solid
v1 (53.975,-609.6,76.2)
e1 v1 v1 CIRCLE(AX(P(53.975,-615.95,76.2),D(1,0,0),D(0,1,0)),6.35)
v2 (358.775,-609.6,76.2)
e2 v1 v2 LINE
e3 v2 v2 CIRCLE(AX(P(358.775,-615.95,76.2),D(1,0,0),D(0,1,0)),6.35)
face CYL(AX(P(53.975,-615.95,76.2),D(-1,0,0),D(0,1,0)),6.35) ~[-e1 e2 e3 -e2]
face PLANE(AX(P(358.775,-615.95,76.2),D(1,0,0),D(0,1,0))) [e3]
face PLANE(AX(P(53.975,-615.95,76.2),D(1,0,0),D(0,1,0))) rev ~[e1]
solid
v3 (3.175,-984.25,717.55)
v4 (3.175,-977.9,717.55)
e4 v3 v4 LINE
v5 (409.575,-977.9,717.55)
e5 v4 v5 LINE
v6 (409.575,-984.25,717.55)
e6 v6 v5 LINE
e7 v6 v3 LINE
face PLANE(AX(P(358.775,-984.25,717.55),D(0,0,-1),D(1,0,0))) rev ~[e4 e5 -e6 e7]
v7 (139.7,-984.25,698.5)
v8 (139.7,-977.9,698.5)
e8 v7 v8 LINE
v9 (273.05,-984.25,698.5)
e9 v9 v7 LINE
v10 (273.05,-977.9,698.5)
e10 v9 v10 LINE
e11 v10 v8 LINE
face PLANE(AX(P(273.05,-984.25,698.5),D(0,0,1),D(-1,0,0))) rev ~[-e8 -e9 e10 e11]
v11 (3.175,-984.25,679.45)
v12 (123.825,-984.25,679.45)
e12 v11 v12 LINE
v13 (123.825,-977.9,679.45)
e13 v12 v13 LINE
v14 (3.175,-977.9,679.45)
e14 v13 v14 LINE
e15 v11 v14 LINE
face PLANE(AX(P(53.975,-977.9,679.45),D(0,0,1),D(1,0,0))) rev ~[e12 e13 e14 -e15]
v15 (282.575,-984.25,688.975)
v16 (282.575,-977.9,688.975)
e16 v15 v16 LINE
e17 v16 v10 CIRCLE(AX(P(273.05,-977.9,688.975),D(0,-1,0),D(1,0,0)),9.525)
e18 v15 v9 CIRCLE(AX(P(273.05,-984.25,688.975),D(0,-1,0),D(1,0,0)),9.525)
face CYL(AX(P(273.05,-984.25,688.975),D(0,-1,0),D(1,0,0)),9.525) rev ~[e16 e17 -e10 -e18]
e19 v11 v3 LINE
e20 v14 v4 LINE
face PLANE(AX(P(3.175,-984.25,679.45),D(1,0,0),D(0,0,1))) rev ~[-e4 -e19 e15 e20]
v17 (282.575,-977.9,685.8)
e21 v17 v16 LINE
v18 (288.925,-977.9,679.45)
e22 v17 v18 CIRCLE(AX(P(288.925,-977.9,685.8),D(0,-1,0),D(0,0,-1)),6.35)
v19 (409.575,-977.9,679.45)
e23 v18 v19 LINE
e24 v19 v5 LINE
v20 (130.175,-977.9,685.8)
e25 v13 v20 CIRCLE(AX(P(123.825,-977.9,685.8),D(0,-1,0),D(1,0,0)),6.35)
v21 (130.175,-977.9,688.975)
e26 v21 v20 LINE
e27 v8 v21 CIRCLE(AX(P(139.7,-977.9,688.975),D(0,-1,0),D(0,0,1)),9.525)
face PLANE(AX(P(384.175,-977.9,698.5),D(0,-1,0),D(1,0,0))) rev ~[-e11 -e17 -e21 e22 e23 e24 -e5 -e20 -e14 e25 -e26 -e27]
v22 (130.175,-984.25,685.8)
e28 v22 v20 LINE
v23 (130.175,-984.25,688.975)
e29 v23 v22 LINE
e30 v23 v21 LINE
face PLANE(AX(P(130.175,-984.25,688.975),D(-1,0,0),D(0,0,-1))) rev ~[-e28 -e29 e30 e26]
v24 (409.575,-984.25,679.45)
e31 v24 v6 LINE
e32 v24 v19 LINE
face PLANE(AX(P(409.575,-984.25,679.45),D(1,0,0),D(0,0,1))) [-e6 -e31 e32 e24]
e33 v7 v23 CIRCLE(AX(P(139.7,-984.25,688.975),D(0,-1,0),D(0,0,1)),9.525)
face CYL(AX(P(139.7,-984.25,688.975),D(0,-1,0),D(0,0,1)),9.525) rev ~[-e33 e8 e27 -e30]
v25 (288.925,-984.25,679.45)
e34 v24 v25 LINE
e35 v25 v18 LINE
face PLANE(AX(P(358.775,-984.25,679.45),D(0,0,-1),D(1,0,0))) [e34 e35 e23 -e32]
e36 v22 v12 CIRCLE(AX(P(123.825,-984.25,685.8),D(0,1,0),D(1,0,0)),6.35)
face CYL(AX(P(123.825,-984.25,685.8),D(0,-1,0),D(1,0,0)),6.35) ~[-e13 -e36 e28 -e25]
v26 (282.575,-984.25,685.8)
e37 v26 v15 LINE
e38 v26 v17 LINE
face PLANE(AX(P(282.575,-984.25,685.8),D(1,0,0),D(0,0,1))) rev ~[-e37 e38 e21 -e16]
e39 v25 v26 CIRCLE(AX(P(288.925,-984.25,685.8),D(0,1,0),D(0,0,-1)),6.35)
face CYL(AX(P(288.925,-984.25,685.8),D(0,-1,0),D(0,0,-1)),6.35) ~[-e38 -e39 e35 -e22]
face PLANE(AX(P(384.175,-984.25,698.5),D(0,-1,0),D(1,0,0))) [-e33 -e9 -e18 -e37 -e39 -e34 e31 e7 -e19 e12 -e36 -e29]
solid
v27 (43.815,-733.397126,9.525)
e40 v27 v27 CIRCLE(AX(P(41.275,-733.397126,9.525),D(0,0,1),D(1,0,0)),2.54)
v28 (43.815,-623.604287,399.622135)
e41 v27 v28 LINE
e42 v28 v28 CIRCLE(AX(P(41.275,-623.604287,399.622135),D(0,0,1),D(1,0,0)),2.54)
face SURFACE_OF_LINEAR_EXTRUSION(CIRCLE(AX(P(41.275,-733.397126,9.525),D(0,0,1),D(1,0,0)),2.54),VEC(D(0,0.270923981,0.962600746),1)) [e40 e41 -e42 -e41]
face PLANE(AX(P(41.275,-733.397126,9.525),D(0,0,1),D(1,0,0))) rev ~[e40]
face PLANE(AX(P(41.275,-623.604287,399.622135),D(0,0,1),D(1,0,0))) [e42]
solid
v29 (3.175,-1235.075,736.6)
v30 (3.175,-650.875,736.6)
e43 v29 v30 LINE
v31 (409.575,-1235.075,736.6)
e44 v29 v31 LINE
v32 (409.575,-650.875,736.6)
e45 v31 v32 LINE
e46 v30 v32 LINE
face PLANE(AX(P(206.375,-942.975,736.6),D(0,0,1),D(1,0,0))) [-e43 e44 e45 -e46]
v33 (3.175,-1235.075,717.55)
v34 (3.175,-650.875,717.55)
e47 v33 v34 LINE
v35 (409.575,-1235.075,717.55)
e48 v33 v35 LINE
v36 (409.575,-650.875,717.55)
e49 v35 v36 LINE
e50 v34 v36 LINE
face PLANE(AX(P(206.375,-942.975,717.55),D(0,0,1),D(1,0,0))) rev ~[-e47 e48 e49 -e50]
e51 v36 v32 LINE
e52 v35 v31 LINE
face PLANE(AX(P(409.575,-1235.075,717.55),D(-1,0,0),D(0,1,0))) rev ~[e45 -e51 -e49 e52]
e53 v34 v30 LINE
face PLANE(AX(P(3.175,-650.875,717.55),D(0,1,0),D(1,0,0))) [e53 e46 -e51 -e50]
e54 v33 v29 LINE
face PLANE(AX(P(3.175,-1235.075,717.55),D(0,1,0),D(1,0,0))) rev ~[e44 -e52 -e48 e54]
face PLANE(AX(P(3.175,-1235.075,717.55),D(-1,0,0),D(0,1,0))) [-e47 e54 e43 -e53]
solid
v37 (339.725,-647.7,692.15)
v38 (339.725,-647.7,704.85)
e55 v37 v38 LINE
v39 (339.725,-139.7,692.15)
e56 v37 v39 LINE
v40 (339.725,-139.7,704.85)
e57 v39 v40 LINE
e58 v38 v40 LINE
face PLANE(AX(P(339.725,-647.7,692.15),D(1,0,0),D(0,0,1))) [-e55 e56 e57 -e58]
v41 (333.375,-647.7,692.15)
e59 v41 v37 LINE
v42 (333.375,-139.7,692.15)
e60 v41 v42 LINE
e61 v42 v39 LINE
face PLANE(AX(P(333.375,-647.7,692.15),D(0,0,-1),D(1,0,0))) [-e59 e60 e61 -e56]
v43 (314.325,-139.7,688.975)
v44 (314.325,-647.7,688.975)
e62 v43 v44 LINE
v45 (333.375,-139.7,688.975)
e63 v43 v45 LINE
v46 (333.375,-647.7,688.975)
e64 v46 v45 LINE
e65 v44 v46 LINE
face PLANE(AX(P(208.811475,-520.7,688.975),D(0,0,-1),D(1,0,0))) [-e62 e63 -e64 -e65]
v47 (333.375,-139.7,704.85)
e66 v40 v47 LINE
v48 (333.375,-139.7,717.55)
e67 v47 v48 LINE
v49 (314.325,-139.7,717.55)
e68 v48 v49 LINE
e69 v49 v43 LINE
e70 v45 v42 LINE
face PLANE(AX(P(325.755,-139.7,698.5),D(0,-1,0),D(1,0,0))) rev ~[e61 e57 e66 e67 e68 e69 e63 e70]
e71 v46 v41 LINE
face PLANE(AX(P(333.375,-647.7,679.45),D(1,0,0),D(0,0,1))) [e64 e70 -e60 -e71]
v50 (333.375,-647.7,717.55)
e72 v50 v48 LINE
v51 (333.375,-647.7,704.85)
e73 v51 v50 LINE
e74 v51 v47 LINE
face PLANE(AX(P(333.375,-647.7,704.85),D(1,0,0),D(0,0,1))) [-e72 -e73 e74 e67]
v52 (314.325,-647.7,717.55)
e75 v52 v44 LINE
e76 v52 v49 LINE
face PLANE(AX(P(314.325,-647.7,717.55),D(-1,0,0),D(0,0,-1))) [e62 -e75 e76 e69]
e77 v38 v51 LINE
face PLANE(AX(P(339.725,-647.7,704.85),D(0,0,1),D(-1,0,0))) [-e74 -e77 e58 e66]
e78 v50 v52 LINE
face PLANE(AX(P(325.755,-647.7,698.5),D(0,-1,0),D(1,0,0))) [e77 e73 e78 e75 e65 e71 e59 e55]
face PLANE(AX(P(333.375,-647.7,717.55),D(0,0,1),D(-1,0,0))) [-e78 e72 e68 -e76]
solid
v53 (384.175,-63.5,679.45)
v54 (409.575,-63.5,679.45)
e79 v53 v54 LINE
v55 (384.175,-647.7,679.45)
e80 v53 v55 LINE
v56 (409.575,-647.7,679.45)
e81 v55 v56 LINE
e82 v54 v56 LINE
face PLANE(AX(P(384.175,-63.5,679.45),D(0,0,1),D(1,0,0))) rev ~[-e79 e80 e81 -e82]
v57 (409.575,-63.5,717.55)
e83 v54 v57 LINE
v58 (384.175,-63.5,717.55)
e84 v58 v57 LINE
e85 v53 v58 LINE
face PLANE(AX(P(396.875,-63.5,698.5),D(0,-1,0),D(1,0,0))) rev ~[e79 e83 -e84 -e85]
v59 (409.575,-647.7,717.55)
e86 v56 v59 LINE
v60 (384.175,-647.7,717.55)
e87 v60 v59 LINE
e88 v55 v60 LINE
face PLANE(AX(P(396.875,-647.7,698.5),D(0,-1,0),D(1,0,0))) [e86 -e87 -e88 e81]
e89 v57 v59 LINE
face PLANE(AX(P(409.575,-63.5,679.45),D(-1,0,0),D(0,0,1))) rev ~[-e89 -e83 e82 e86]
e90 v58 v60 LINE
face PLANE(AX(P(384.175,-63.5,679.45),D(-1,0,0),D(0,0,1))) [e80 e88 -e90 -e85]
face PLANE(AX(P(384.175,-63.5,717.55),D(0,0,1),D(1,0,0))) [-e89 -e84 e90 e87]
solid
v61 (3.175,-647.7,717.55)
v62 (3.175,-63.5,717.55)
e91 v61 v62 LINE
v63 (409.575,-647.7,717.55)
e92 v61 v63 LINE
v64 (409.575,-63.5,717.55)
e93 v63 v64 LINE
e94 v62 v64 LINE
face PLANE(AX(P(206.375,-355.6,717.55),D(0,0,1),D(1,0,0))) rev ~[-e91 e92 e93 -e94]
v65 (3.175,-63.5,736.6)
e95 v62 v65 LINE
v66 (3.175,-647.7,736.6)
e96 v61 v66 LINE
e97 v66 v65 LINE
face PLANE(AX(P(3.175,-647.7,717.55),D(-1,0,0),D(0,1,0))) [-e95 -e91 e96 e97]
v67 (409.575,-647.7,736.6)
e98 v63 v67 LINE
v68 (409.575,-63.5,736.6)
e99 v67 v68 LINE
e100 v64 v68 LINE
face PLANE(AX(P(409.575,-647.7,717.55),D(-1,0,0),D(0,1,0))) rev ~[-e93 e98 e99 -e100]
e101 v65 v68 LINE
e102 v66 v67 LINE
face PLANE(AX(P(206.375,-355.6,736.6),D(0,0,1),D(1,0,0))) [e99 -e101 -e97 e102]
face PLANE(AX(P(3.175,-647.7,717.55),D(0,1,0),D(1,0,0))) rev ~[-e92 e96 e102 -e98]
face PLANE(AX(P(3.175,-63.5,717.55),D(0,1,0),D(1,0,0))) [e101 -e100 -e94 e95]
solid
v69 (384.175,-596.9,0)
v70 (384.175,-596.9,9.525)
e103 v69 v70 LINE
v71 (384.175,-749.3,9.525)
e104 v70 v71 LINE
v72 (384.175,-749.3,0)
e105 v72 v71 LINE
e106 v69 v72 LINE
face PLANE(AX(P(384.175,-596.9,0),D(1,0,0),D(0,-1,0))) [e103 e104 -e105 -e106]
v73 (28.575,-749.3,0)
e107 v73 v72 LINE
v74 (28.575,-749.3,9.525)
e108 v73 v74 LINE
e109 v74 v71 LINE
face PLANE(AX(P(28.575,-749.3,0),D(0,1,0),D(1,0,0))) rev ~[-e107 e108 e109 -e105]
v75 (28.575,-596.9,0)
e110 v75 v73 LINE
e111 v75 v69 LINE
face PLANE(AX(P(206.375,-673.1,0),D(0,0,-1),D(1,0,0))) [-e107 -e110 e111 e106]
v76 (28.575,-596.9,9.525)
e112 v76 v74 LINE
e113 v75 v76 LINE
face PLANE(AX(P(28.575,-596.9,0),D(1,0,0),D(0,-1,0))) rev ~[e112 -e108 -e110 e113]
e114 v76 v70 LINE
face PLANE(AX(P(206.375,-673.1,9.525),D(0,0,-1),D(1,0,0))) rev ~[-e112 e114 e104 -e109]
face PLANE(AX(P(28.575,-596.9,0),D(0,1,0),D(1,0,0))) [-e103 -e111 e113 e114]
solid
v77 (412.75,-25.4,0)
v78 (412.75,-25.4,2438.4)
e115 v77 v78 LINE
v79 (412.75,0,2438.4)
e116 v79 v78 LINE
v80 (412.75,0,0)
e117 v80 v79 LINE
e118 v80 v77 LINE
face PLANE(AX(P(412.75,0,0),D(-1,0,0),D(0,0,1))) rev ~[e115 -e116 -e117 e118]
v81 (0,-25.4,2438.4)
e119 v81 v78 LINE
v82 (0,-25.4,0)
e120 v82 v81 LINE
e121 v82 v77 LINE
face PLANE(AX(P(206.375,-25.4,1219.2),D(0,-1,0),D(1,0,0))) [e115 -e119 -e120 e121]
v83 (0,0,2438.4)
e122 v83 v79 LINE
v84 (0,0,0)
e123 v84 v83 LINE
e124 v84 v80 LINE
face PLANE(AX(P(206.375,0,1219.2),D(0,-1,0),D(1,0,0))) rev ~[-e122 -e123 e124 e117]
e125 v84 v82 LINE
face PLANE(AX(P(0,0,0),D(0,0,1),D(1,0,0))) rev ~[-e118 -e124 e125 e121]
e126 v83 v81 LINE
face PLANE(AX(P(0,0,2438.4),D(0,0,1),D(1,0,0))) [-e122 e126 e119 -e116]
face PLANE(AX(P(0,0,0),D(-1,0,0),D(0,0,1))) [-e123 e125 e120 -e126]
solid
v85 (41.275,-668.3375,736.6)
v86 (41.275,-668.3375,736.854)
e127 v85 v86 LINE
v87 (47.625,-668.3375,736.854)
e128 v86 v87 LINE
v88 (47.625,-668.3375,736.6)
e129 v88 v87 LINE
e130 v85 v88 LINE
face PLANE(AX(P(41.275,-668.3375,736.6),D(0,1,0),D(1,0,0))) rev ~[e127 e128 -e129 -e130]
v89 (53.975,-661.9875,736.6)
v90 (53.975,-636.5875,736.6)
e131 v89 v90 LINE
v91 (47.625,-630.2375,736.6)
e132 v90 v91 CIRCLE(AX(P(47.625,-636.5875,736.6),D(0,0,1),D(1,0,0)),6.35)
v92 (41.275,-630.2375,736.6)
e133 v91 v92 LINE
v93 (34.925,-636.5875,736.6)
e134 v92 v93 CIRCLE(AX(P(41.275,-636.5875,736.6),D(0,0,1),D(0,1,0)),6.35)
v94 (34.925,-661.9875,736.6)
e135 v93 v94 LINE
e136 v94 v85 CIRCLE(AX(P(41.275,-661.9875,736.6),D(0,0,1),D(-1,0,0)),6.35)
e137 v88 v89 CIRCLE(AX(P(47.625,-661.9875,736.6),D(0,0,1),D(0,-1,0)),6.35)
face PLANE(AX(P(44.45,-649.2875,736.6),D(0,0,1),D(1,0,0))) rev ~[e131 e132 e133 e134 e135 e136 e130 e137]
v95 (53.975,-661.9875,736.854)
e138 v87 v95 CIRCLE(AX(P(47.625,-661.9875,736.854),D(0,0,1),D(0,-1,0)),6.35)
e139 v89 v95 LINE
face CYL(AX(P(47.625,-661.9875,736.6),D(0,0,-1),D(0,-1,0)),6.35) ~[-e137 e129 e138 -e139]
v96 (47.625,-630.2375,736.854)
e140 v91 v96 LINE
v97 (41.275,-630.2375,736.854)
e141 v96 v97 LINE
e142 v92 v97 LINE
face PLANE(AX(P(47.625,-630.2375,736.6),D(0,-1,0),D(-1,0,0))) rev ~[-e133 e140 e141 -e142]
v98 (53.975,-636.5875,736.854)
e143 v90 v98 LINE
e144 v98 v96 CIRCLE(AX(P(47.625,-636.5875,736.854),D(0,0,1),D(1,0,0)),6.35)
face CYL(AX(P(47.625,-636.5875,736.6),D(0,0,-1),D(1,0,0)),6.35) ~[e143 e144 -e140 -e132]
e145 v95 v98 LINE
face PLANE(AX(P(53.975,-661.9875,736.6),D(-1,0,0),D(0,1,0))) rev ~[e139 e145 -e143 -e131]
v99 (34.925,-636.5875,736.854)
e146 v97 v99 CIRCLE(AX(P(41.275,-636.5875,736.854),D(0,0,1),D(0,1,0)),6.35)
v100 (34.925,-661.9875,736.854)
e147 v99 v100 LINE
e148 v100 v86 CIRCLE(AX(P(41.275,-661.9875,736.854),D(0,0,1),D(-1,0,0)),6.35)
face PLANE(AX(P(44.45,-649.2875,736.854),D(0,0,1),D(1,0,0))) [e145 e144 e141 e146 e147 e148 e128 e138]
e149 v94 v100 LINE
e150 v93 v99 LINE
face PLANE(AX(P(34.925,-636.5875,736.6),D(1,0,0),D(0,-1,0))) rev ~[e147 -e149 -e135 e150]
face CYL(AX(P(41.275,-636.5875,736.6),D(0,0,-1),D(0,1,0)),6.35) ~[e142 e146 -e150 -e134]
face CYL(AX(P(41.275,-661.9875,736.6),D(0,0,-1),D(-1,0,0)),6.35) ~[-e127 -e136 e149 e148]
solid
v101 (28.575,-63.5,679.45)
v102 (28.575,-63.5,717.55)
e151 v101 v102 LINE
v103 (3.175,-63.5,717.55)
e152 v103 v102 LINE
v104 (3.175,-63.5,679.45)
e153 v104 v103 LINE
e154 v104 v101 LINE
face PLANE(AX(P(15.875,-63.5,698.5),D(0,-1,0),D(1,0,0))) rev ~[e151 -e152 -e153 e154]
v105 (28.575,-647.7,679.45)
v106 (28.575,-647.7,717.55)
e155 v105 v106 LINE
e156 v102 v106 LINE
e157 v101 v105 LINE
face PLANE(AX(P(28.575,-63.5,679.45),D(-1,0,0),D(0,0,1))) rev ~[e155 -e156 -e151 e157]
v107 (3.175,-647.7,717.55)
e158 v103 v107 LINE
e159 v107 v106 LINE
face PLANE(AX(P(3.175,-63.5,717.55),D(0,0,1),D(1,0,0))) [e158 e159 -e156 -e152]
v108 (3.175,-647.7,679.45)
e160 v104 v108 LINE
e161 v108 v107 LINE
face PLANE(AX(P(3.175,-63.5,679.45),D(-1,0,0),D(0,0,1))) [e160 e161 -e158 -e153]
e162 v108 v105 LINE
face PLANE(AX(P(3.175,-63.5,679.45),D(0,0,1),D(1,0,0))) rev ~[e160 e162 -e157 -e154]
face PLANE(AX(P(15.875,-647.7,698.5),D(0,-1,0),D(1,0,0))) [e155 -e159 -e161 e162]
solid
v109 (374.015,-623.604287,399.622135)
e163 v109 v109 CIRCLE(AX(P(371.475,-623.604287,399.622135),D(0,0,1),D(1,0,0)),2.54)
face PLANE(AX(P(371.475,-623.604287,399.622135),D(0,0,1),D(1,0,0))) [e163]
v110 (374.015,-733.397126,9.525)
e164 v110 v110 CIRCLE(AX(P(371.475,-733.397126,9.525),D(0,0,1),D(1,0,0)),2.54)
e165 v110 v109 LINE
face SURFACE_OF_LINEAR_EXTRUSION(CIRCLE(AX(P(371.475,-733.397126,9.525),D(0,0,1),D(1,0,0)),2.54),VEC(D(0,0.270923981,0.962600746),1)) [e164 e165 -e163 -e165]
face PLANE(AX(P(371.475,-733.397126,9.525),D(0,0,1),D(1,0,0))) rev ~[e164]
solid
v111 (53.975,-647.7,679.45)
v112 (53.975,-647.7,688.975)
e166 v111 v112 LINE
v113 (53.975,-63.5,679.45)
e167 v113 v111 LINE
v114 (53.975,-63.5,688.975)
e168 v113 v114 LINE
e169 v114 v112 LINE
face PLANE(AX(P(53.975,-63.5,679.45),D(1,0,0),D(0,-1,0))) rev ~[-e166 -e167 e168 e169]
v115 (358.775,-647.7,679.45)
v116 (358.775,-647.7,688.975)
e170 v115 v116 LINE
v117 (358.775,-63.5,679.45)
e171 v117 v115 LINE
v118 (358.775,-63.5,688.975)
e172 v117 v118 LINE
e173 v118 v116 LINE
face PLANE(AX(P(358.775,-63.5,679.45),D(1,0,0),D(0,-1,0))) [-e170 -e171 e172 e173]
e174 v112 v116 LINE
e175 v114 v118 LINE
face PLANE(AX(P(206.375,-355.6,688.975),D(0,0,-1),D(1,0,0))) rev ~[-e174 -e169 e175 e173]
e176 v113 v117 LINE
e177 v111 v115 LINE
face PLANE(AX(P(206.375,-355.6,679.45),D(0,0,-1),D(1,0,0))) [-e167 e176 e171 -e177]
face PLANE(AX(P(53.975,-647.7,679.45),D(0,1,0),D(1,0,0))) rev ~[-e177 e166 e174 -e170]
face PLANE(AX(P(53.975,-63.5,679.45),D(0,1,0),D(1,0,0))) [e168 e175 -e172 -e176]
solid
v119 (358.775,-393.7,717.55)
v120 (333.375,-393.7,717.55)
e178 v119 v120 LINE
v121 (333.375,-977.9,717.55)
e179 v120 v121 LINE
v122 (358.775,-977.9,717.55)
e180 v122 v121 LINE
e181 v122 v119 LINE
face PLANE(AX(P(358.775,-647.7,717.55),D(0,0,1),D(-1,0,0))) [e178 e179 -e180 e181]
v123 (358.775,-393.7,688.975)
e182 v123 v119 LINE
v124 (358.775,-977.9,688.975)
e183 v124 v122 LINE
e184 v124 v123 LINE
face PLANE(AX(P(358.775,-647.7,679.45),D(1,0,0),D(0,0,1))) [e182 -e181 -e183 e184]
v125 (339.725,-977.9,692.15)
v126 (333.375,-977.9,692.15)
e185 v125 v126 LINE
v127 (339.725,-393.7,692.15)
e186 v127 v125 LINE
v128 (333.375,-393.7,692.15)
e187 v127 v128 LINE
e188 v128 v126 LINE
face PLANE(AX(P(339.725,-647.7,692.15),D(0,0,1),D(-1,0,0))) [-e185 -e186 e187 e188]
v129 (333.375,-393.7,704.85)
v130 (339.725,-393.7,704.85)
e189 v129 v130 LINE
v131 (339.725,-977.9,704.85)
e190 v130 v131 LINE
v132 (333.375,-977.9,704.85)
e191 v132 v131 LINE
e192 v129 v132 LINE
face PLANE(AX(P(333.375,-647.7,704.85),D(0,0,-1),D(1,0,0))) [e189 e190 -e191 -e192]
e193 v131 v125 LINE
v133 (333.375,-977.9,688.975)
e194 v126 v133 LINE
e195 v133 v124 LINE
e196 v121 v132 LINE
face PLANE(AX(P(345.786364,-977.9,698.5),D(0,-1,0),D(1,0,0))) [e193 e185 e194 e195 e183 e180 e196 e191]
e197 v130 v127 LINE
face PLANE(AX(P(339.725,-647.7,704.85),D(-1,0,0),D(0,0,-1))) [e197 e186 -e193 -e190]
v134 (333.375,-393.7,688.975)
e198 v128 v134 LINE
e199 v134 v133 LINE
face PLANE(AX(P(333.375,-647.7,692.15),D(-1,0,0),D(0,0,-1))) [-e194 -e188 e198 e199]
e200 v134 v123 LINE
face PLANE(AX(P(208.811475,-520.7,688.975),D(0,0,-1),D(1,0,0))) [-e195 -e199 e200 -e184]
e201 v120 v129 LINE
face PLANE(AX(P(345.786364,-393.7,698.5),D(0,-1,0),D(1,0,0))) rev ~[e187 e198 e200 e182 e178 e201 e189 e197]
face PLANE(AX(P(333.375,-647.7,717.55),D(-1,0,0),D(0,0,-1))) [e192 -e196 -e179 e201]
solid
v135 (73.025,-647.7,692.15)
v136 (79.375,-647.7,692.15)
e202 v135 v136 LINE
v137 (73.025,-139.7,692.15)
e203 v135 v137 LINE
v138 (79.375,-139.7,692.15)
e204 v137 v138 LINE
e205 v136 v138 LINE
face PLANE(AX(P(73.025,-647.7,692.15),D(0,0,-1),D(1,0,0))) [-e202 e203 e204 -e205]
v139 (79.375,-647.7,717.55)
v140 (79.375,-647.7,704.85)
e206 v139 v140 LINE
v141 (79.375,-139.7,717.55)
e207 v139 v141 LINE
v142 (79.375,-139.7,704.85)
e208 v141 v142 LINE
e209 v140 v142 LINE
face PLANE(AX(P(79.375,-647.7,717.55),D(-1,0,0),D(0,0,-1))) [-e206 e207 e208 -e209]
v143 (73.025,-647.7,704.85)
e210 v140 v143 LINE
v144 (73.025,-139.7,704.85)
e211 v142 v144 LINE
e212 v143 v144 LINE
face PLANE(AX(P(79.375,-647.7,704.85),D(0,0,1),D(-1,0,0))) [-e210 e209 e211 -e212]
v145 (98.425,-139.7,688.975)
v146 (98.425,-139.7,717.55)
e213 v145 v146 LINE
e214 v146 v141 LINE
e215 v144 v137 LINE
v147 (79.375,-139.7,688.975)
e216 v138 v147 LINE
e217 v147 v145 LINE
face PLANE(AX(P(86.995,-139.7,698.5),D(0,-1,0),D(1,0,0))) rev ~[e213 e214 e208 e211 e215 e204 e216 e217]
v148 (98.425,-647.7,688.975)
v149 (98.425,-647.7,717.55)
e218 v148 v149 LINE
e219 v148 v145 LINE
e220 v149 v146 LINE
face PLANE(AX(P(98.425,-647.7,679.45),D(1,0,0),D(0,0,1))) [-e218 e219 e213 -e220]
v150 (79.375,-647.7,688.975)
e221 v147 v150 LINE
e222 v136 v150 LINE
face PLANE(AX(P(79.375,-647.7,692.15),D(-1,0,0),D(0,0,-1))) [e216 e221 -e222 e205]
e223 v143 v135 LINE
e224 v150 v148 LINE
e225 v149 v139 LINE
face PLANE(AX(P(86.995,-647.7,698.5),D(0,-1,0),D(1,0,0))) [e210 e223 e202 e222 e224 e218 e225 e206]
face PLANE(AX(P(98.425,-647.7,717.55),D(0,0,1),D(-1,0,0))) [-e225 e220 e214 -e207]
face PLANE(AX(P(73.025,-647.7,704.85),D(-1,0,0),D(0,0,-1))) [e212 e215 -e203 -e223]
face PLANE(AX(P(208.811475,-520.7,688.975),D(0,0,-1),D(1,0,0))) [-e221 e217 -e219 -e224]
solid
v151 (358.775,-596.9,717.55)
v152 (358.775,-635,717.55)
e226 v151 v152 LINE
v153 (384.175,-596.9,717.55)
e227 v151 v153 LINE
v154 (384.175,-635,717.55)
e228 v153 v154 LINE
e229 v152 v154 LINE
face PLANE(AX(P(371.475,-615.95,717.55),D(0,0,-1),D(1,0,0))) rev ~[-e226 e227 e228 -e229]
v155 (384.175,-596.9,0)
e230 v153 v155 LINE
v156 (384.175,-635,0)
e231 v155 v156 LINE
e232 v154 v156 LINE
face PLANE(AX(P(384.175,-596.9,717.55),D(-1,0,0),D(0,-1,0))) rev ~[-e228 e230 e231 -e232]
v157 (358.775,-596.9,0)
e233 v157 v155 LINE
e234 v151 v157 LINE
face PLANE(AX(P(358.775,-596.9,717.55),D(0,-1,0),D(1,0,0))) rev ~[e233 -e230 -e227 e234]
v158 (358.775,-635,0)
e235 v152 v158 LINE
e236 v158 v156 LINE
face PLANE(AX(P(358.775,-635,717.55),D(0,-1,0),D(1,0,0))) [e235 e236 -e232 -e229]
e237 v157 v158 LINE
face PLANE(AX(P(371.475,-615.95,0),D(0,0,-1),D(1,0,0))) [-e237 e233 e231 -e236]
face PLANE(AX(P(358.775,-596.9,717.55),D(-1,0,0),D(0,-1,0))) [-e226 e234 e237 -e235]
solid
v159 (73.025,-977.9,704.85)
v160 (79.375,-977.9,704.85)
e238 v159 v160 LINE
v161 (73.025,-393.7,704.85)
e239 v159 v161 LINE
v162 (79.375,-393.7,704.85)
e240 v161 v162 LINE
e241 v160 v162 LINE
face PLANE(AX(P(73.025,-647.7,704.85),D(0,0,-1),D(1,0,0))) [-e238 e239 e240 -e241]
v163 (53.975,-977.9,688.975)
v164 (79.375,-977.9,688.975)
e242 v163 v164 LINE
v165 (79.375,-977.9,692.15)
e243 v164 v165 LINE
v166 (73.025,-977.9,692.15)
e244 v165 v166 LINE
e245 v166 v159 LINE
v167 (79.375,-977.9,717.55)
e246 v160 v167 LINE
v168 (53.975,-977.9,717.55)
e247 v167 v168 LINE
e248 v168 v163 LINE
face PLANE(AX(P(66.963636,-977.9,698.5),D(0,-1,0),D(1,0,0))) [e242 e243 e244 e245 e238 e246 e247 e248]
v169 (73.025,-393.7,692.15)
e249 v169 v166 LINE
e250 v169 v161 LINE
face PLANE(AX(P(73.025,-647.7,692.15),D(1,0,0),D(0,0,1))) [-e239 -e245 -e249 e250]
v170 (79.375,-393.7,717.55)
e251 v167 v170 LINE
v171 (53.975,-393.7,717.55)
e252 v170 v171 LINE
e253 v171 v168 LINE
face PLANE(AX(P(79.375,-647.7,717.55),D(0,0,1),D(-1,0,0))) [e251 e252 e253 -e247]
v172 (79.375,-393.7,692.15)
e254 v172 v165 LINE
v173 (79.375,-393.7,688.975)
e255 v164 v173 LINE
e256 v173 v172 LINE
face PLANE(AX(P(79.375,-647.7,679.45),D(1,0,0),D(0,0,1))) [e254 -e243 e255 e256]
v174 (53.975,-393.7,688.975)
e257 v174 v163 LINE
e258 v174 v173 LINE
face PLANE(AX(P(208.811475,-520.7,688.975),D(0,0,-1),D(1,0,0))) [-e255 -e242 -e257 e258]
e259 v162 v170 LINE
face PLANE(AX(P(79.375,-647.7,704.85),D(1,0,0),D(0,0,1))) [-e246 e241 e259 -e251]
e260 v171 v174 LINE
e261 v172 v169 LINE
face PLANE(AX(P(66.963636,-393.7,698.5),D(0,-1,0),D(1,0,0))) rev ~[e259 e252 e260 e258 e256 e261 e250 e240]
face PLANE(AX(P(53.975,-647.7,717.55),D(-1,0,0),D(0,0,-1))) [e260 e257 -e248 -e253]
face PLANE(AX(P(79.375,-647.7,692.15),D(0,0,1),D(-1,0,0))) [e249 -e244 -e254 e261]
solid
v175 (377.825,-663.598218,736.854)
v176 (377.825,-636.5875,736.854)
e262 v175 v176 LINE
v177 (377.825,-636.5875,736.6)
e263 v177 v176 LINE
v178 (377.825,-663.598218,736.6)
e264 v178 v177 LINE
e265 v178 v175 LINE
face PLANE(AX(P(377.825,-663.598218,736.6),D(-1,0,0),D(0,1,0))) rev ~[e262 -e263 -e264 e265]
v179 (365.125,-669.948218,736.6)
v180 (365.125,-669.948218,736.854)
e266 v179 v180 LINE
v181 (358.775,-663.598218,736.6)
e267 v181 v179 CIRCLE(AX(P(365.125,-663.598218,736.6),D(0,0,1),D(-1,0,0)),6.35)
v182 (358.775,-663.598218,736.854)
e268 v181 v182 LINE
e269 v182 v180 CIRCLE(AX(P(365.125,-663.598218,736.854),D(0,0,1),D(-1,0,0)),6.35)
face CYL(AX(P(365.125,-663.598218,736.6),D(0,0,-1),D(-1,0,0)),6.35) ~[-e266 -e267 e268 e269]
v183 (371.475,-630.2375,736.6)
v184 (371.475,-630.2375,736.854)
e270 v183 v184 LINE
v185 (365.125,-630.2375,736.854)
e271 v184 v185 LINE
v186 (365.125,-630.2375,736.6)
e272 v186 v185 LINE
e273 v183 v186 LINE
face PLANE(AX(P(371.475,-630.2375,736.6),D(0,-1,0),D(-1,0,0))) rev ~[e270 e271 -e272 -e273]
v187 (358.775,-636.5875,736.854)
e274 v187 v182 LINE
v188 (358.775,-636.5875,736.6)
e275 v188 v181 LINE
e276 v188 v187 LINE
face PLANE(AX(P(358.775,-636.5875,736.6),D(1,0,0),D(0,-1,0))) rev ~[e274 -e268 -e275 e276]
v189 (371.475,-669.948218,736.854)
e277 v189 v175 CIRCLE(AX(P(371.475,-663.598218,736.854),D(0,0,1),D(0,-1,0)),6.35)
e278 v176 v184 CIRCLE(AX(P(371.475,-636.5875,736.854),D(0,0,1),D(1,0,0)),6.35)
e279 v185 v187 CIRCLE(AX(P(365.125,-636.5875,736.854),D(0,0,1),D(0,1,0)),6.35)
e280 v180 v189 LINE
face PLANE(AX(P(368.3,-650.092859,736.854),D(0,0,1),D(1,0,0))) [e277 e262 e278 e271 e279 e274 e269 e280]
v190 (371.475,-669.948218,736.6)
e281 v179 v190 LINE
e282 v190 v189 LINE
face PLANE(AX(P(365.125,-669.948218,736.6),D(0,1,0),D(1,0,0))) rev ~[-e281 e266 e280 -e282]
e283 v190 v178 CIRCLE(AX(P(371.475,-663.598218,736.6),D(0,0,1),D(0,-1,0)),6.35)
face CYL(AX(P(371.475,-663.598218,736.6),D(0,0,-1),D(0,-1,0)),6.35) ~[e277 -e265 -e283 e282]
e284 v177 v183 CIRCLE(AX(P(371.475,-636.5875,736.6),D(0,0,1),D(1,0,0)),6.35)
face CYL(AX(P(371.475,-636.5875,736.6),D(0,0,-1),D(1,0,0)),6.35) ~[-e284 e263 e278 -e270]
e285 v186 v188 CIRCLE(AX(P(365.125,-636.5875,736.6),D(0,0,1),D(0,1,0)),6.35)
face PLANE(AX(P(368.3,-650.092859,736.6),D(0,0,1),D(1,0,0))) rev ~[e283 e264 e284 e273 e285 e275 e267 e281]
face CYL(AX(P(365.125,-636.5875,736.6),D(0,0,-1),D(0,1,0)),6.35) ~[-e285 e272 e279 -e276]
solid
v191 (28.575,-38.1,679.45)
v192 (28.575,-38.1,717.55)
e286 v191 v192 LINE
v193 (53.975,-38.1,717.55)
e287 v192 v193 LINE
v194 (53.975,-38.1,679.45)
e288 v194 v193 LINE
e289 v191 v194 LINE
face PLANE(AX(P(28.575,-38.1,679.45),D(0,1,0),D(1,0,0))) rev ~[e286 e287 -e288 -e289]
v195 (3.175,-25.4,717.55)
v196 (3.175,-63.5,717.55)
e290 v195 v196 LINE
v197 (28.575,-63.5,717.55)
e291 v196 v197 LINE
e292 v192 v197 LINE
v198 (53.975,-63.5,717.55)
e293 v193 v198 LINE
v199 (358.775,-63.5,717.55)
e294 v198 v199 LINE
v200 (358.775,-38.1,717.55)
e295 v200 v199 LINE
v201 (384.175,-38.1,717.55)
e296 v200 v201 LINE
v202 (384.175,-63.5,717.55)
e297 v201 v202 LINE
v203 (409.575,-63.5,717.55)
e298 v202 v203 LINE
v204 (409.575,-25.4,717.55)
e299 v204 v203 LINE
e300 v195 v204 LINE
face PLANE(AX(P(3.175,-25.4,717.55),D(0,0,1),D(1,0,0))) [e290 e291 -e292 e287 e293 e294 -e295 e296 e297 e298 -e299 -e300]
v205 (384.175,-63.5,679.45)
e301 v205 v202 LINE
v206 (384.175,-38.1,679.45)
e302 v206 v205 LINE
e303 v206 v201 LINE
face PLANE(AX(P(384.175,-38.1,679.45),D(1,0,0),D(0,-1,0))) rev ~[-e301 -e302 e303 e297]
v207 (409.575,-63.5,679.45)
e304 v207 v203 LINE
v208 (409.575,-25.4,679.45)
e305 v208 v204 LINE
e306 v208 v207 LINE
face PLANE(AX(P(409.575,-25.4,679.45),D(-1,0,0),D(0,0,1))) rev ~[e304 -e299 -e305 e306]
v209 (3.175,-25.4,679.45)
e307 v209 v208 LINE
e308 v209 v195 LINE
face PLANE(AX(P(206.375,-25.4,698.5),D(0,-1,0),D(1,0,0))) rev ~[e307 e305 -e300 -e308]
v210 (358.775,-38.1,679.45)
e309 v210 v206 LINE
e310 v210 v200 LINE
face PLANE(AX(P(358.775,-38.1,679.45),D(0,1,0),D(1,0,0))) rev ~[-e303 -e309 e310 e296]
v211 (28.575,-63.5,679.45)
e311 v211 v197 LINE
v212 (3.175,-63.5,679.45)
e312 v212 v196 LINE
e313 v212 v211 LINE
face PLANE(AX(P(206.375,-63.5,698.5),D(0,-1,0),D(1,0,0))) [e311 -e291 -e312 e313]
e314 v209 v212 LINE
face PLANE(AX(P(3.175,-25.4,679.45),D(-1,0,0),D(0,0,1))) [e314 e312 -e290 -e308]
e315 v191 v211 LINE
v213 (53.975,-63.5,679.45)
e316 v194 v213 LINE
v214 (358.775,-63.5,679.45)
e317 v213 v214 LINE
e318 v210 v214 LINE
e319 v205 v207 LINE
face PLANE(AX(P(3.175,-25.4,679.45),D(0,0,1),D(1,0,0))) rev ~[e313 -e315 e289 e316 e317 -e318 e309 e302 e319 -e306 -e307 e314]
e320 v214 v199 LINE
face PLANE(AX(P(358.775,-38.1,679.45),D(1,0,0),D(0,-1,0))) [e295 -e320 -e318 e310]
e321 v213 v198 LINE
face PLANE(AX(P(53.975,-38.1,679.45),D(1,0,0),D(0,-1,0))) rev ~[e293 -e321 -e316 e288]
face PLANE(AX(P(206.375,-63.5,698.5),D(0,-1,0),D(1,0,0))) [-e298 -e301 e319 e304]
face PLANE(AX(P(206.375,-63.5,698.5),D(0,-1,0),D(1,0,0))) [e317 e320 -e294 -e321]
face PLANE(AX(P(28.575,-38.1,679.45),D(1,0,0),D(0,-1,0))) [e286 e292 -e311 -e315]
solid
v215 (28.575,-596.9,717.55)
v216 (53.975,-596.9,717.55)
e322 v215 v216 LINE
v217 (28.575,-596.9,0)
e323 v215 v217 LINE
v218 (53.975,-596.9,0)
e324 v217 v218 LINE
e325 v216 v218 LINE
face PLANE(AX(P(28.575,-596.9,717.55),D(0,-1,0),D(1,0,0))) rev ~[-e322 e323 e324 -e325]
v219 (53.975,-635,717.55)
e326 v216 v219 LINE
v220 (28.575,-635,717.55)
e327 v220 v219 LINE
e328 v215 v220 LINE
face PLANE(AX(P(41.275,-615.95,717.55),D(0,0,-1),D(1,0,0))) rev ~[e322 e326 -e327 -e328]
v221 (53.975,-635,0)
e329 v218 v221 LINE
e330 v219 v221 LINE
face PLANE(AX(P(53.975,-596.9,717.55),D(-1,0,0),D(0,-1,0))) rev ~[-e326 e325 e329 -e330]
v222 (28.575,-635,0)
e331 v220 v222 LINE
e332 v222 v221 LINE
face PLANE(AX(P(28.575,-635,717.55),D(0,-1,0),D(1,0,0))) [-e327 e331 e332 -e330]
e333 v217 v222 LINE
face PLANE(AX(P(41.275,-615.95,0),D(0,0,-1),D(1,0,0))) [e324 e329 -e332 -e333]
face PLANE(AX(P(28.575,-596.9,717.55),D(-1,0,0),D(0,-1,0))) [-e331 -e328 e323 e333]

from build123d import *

# Parameters (mm, degrees)
F0_W           = 412.75
F0_H           = 2438.4
F1_DEPTH       = 25.4
F3_W           = 406.4
F3_H           = 38.1
F4_DEPTH       = 38.1
F5_W           = 406.4
F5_H           = 18.25625
F6_DEPTH       = 577.85
F7_W           = 25.4
F7_H           = 38.1
F8_DEPTH       = 584.2
F10_DEPTH      = 330.2
F10_DEPTH_BACK = 254
F11_W          = 304.8
F11_H          = 38.1
F12_DEPTH      = 6.35
F14_DEPTH      = 508
F15_W          = 329.3162656754
F15_H          = 914.4
F16_DEPTH      = 9.525
F17_W          = 304.8
F17_H          = 584.2
F18_DEPTH      = 9.525
F20_DEPTH      = 25.4
F21_W          = 406.4
F21_H          = 584.2
F22_DEPTH      = 19.05
F23_W          = 25.4
F23_H          = 38.1
F24_DEPTH      = 717.55
F25_W          = 355.6
F25_H          = 152.4
F26_DEPTH      = 9.525
F27_W          = 25.4
F27_H          = 25.4
F28_DEPTH      = 38.1
F34_R          = 2.54
F36_R          = 6.35
F37_DEPTH      = 304.8
F39_W          = 50.8
F39_H          = 38.1
F40_DEPTH      = 6.35
F42_DEPTH      = 0.254


with BuildPart() as f1:
    # F0 (on Front) → F1 (new body)
    with BuildSketch(Plane.XZ):
        with Locations((206.375, 1219.2)):
            Rectangle(F0_W, F0_H)
    extrude(amount=F1_DEPTH)


with BuildPart() as f4:
    # F3 (on face) → F4 (new body)
    with BuildSketch(Plane.XZ.offset(25.4)):
        with Locations((206.375, 698.5)):
            Rectangle(F3_W, F3_H)
    extrude(amount=F4_DEPTH)

    # F27 (on face) → F28 (cut, through all)
    with BuildSketch(Plane(origin=(0, 0, 679.45), x_dir=(1, 0, 0), z_dir=(0, 0, -1))):
        with Locations((41.275, 50.8)):
            Rectangle(F27_W, F27_H)
        with Locations((371.475, 50.8)):
            Rectangle(F27_W, F27_H)
    extrude(amount=-F28_DEPTH, mode=Mode.SUBTRACT)


with BuildPart() as f6:
    # F5 (on face) → F6 (new body, through all)
    with BuildSketch(Plane.XY.offset(717.55)):
        with Locations((206.375, -34.528125)):
            Rectangle(F5_W, F5_H)
    extrude(amount=F6_DEPTH)


with BuildPart() as f6b:
    # F5 (on face) → F6, piece 2 (new body, through all)
    with BuildSketch(Plane.XY.offset(717.55)):
        with Locations((206.375, -54.371875)):
            Rectangle(F5_W, F5_H)
    extrude(amount=F6_DEPTH)


with BuildPart() as f8:
    # F7 (on face) → F8 (new body)
    with BuildSketch(Plane.XZ.offset(63.5)):
        with Locations((15.875, 698.5)):
            Rectangle(F7_W, F7_H)
    extrude(amount=F8_DEPTH)


with BuildPart() as f8b:
    # F7 (on face) → F8, piece 2 (new body)
    with BuildSketch(Plane.XZ.offset(63.5)):
        with Locations((396.875, 698.5)):
            Rectangle(F7_W, F7_H)
    extrude(amount=F8_DEPTH)


with BuildPart() as f10:
    # F9 (on face) → F10 (new body, two sides)
    with BuildSketch(Plane.XZ.offset(647.7)) as f10_sk:
        Polygon((79.375, 717.55), (53.975, 717.55), (53.975, 679.45), (79.375, 679.45), (79.375, 692.15), (73.025, 692.15), (73.025, 704.85), (79.375, 704.85), align=None)
    extrude(amount=F10_DEPTH)
    extrude(f10_sk.sketch, amount=-F10_DEPTH_BACK)


with BuildPart() as f10b:
    # F9 (on face) → F10, piece 2 (new body, two sides)
    with BuildSketch(Plane.XZ.offset(647.7)) as f10_2_sk:
        Polygon((358.775, 717.55), (333.375, 717.55), (333.375, 704.85), (339.725, 704.85), (339.725, 692.15), (333.375, 692.15), (333.375, 679.45), (358.775, 679.45), align=None)
    extrude(amount=F10_DEPTH)
    extrude(f10_2_sk.sketch, amount=-F10_DEPTH_BACK)


with BuildPart() as f12:
    # F11 (on face) → F12 (new body)
    with BuildSketch(Plane.XZ.offset(977.9)):
        with Locations((206.375, 698.5)):
            Rectangle(F11_W, F11_H)
    extrude(amount=F12_DEPTH)

    # F19 (on face) → F20 (cut)
    with BuildSketch(Plane.XZ.offset(984.25)):
        with BuildLine():
            Line((273.05, 698.5), (139.7, 698.5))
            ThreePointArc((139.7, 698.5), (132.9648079092, 695.7101920908), (130.175, 688.975))
            Line((130.175, 688.975), (130.175, 685.8))
            ThreePointArc((130.175, 685.8), (128.3151280605, 681.3098719395), (123.825, 679.45))
            Line((123.825, 679.45), (104.5370513368, 679.45))
            Line((104.5370513368, 679.45), (95.1471963692, 663.4348630905))
            Line((95.1471963692, 663.4348630905), (306.0875535011, 663.4348630905))
            Line((306.0875535011, 663.4348630905), (306.0875535011, 679.45))
            Line((306.0875535011, 679.45), (288.925, 679.45))
            ThreePointArc((288.925, 679.45), (284.4348719395, 681.3098719395), (282.575, 685.8))
            Line((282.575, 685.8), (282.575, 688.975))
            ThreePointArc((282.575, 688.975), (279.7851920908, 695.7101920908), (273.05, 698.5))
        make_face()
    extrude(amount=-F20_DEPTH, mode=Mode.SUBTRACT)

    # F39 (on face) → F40 (join)
    with BuildSketch(Plane.XZ.offset(984.25)):
        with Locations((384.175, 698.5)):
            Rectangle(F39_W, F39_H)
        with Locations((28.575, 698.5)):
            Rectangle(F39_W, F39_H)
    extrude(amount=-F40_DEPTH)


with BuildPart() as f14:
    # F13 (on face) → F14 (new body)
    with BuildSketch(Plane.XZ.offset(647.7)):
        Polygon((98.425, 717.55), (79.375, 717.55), (79.375, 704.85), (73.025, 704.85), (73.025, 692.15), (79.375, 692.15), (79.375, 679.45), (98.425, 679.45), align=None)
    extrude(amount=-F14_DEPTH)


with BuildPart() as f14b:
    # F13 (on face) → F14, piece 2 (new body)
    with BuildSketch(Plane.XZ.offset(647.7)):
        Polygon((333.375, 704.85), (333.375, 717.55), (314.325, 717.55), (314.325, 679.45), (333.375, 679.45), (333.375, 692.15), (339.725, 692.15), (339.725, 704.85), align=None)
    extrude(amount=-F14_DEPTH)


with BuildPart() as f16_tool:
    # F15 (on face) → F16 (new body)
    with BuildSketch(Plane(origin=(0, 0, 679.45), x_dir=(1, 0, 0), z_dir=(0, 0, -1))):
        with Locations((208.811474897, 520.7)):
            Rectangle(F15_W, F15_H)
    extrude(amount=-F16_DEPTH)


with BuildPart() as f10_1:
    add(f10.part)

    # F16: cut by f16_tool
    add(f16_tool.part, mode=Mode.SUBTRACT)


with BuildPart() as f10b_1:
    add(f10b.part)

    # F16: cut by f16_tool
    add(f16_tool.part, mode=Mode.SUBTRACT)


with BuildPart() as f14_1:
    add(f14.part)

    # F16: cut by f16_tool
    add(f16_tool.part, mode=Mode.SUBTRACT)


with BuildPart() as f14b_1:
    add(f14b.part)

    # F16: cut by f16_tool
    add(f16_tool.part, mode=Mode.SUBTRACT)


with BuildPart() as f18:
    # F17 (on face) → F18 (new body, through all)
    with BuildSketch(Plane(origin=(0, 0, 679.45), x_dir=(1, 0, 0), z_dir=(0, 0, -1))):
        with Locations((206.375, 355.6)):
            Rectangle(F17_W, F17_H)
    extrude(amount=-F18_DEPTH)


with BuildPart() as f22:
    # F21 (on face) → F22 (new body)
    with BuildSketch(Plane.XY.offset(717.55)):
        with Locations((206.375, -355.6)):
            Rectangle(F21_W, F21_H)
    extrude(amount=F22_DEPTH)


with BuildPart() as f22b:
    # F21 (on face) → F22, piece 2 (new body)
    with BuildSketch(Plane.XY.offset(717.55)):
        with Locations((206.375, -942.975)):
            Rectangle(F21_W, F21_H)
    extrude(amount=F22_DEPTH)


with BuildPart() as f24:
    # F23 (on face) → F24 (new body, through all)
    with BuildSketch(Plane(origin=(0, 0, 717.55), x_dir=(1, 0, 0), z_dir=(0, 0, -1))):
        with Locations((41.275, 615.95)):
            Rectangle(F23_W, F23_H)
    extrude(amount=F24_DEPTH)


with BuildPart() as f24b:
    # F23 (on face) → F24, piece 2 (new body, through all)
    with BuildSketch(Plane(origin=(0, 0, 717.55), x_dir=(1, 0, 0), z_dir=(0, 0, -1))):
        with Locations((371.475, 615.95)):
            Rectangle(F23_W, F23_H)
    extrude(amount=F24_DEPTH)


with BuildPart() as f26:
    # F25 (on face) → F26 (new body)
    with BuildSketch(Plane(origin=(0, 0, 0), x_dir=(1, 0, 0), z_dir=(0, 0, -1))):
        with Locations((206.375, 673.1)):
            Rectangle(F25_W, F25_H)
    extrude(amount=-F26_DEPTH)


with BuildPart() as f35:
    # F35: sweep along a path in F32
    with BuildLine(Plane.YZ.offset(41.275)) as f35_path:
        Line((-733.3971261978, 9.525), (-635.2745294571, 358.1574260011))
        Line((-635.2745294571, 358.1574260011), (-623.6042869703, 399.622135307))
    # F34 (on face) → F35 (sweep)
    with BuildSketch(Plane.XY.offset(9.525)):
        with Locations((41.275, -733.3971261978)):
            Circle(F34_R)
        with Locations((371.475, -733.3971261978)):
            Circle(F34_R)
    sweep(path=f35_path.line)


with BuildPart() as f37:
    # F36 (on face) → F37 (new body, through all)
    with BuildSketch(Plane.YZ.offset(53.975)):
        with Locations((-615.95, 76.2)):
            Circle(F36_R)
    extrude(amount=F37_DEPTH)


with BuildPart() as f42:
    # F41 (on face) → F42 (new body)
    with BuildSketch(Plane.XY.offset(736.6)):
        with BuildLine():
            Line((47.625, -630.2375), (41.275, -630.2375))
            ThreePointArc((41.275, -630.2375), (36.7848719395, -632.0973719395), (34.925, -636.5875))
            Line((34.925, -636.5875), (34.925, -661.9875))
            ThreePointArc((34.925, -661.9875), (36.7848719395, -666.4776280605), (41.275, -668.3375))
            Line((41.275, -668.3375), (47.625, -668.3375))
            ThreePointArc((47.625, -668.3375), (52.1151280605, -666.4776280605), (53.975, -661.9875))
            Line((53.975, -661.9875), (53.975, -636.5875))
            ThreePointArc((53.975, -636.5875), (52.1151280605, -632.0973719395), (47.625, -630.2375))
        make_face()
    extrude(amount=F42_DEPTH)


with BuildPart() as f42b:
    # F41 (on face) → F42, piece 2 (new body)
    with BuildSketch(Plane.XY.offset(736.6)):
        with BuildLine():
            Line((371.475, -630.2375), (365.125, -630.2375))
            ThreePointArc((365.125, -630.2375), (360.6348719395, -632.0973719395), (358.775, -636.5875))
            Line((358.775, -636.5875), (358.775, -663.5982181152))
            ThreePointArc((358.775, -663.5982181152), (360.6348719395, -668.0883461758), (365.125, -669.9482181152))
            Line((365.125, -669.9482181152), (371.475, -669.9482181152))
            ThreePointArc((371.475, -669.9482181152), (375.9651280605, -668.0883461758), (377.825, -663.5982181152))
            Line((377.825, -663.5982181152), (377.825, -636.5875))
            ThreePointArc((377.825, -636.5875), (375.9651280605, -632.0973719395), (371.475, -630.2375))
        make_face()
    extrude(amount=F42_DEPTH)


solid = Compound([f1.part, f4.part, f8.part, f8b.part, f12.part, f10_1.part, f10b_1.part, f14_1.part, f14b_1.part, f18.part, f22.part, f22b.part, f24.part, f24b.part, f26.part, f35.part, f37.part, f42.part, f42b.part])
